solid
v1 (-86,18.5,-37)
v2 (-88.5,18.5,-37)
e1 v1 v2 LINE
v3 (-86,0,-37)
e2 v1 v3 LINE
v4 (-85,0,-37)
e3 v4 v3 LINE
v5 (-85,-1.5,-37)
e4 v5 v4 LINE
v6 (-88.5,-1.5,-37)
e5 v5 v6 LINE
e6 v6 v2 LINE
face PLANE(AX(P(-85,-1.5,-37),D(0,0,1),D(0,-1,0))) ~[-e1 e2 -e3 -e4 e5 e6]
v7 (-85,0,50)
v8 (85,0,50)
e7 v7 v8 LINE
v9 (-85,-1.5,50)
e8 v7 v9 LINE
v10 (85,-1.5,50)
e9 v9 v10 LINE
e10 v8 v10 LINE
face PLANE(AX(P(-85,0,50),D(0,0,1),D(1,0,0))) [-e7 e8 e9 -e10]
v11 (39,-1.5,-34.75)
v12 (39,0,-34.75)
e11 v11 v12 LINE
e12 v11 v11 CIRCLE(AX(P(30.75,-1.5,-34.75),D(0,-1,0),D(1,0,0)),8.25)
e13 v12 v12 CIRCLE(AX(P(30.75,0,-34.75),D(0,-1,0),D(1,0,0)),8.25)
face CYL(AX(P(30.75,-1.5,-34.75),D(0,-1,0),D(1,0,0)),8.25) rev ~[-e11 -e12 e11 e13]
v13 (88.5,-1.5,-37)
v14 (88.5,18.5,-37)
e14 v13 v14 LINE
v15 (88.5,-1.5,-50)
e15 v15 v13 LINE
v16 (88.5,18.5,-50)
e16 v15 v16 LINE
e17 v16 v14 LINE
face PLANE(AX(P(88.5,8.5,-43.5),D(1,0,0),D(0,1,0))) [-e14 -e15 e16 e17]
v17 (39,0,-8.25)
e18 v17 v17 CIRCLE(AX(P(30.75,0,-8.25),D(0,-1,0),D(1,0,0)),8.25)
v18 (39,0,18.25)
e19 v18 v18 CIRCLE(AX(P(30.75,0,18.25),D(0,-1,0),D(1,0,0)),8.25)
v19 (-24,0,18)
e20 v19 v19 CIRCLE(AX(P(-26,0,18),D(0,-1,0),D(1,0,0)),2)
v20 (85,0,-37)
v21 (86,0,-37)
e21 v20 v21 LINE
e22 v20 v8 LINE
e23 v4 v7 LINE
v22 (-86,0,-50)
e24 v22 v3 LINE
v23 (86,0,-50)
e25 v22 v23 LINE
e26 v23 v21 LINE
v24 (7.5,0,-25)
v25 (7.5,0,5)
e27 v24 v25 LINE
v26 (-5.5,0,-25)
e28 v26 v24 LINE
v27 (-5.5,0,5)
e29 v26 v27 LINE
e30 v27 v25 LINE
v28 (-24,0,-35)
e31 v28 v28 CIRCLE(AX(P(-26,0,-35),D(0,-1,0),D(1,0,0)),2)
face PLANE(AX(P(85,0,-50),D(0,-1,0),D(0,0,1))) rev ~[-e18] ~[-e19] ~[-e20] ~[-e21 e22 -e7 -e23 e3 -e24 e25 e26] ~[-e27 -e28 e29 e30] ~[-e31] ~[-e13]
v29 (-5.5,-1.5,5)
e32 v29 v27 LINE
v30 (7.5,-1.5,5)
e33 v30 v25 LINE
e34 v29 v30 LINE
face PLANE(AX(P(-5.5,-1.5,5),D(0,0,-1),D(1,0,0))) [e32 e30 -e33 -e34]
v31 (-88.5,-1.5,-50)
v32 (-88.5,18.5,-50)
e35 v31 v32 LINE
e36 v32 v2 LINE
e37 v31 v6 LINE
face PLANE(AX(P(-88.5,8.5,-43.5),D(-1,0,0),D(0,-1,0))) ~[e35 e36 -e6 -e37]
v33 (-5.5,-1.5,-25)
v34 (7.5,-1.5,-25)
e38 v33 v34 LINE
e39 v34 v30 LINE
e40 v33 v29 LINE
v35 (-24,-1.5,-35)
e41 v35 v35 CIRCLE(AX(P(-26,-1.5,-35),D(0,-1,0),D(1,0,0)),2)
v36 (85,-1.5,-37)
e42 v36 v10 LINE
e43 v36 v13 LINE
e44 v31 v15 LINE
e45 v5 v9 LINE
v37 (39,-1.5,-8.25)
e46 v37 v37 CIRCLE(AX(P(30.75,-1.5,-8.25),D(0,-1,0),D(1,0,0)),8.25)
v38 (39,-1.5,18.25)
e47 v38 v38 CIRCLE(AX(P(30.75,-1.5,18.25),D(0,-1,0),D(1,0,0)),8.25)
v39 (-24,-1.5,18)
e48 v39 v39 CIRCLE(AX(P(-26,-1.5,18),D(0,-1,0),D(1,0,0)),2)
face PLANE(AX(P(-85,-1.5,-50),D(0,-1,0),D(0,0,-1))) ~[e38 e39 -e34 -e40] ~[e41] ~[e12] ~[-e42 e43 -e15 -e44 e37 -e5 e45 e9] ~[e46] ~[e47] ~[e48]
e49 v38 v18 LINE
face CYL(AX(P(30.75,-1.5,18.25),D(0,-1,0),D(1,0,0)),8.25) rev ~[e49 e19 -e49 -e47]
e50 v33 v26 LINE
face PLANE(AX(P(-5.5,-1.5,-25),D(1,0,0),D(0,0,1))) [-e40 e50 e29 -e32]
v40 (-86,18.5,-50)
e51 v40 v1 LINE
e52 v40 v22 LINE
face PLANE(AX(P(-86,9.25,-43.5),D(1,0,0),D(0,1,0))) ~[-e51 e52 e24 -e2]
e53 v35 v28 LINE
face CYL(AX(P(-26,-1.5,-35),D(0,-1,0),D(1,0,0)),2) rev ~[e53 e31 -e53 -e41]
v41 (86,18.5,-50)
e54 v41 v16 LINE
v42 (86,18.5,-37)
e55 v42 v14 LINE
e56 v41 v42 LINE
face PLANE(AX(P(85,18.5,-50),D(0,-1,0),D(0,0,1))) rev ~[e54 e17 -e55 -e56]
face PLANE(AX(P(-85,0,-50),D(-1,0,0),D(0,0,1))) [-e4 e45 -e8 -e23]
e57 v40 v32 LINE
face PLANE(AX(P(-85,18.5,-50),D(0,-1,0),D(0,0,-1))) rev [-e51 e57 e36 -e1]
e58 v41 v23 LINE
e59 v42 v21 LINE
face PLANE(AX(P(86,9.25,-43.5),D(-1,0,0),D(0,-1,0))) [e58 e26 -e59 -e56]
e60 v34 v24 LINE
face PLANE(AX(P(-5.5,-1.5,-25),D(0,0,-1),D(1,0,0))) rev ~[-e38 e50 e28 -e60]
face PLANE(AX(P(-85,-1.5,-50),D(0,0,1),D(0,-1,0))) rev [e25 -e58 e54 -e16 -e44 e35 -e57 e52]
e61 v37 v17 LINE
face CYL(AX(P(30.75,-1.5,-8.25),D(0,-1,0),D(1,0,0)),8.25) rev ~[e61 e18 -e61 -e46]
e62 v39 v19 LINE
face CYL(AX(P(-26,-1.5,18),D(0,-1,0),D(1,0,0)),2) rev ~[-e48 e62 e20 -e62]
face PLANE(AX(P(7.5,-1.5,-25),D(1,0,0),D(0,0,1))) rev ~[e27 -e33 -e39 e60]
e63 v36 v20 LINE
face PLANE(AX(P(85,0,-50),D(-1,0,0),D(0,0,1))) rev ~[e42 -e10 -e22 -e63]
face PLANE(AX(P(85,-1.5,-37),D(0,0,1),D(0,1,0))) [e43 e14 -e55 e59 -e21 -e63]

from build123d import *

# Parameters (mm, degrees)
F0_W     = 170
F0_H     = 100
F1_DEPTH = 1.5
F2_R     = 8.25
F2_W     = 13
F2_H     = 30
F2_R_2   = 2
F3_DEPTH = 25
F4_W     = 20
F4_H     = 13
F5_DEPTH = 3.5
F6_W     = 18.5
F6_H     = 13
F7_DEPTH = 1


# Not quite as in the source:
# - a pattern or mirror of a feature is missing from the dataset's text; its kind, count and spacing are read off the source's solid


with BuildPart() as f1:
    # F0 (on Front) → F1 (new body)
    with BuildSketch(Plane.XZ):
        Rectangle(F0_W, F0_H)
    extrude(amount=F1_DEPTH)

    # F2 (on face) → F3 (cut)
    with BuildSketch(Plane.XZ.offset(1.5)):
        with Locations((30.75, -34.75)):
            Circle(F2_R)
        with Locations((30.75, -8.25)):
            Circle(F2_R)
        with Locations((30.75, 18.25)):
            Circle(F2_R)
        with Locations((1, -10)):
            Rectangle(F2_W, F2_H)
        with Locations((-26, -35)):
            Circle(F2_R_2)
        with Locations((-26, 18)):
            Circle(F2_R_2)
    extrude(amount=-F3_DEPTH, mode=Mode.SUBTRACT)

    # F4 (on face) → F5 (join)
    with BuildSketch(Plane.YZ.offset(85)):
        with Locations((8.5, -43.5)):
            Rectangle(F4_W, F4_H)
    f5 = extrude(amount=F5_DEPTH)

    # F5_copies: F5 across plane
    add(f5.mirror(Plane(origin=(0, 0, 0), x_dir=(0, 0, -1), z_dir=(-1, 0, 0))))

    # F6 (on face) → F7 (cut)
    with BuildSketch(Plane(origin=(85, 0, 0), x_dir=(0, -1, 0), z_dir=(-1, 0, 0))):
        with Locations((-9.25, -43.5)):
            Rectangle(F6_W, F6_H)
    f7 = extrude(amount=-F7_DEPTH, mode=Mode.SUBTRACT)

    # F7_copies: F7 across plane
    add(f7.mirror(Plane(origin=(0, 0, 0), x_dir=(0, 0, -1), z_dir=(-1, 0, 0))), mode=Mode.SUBTRACT)


solid = f1.part
